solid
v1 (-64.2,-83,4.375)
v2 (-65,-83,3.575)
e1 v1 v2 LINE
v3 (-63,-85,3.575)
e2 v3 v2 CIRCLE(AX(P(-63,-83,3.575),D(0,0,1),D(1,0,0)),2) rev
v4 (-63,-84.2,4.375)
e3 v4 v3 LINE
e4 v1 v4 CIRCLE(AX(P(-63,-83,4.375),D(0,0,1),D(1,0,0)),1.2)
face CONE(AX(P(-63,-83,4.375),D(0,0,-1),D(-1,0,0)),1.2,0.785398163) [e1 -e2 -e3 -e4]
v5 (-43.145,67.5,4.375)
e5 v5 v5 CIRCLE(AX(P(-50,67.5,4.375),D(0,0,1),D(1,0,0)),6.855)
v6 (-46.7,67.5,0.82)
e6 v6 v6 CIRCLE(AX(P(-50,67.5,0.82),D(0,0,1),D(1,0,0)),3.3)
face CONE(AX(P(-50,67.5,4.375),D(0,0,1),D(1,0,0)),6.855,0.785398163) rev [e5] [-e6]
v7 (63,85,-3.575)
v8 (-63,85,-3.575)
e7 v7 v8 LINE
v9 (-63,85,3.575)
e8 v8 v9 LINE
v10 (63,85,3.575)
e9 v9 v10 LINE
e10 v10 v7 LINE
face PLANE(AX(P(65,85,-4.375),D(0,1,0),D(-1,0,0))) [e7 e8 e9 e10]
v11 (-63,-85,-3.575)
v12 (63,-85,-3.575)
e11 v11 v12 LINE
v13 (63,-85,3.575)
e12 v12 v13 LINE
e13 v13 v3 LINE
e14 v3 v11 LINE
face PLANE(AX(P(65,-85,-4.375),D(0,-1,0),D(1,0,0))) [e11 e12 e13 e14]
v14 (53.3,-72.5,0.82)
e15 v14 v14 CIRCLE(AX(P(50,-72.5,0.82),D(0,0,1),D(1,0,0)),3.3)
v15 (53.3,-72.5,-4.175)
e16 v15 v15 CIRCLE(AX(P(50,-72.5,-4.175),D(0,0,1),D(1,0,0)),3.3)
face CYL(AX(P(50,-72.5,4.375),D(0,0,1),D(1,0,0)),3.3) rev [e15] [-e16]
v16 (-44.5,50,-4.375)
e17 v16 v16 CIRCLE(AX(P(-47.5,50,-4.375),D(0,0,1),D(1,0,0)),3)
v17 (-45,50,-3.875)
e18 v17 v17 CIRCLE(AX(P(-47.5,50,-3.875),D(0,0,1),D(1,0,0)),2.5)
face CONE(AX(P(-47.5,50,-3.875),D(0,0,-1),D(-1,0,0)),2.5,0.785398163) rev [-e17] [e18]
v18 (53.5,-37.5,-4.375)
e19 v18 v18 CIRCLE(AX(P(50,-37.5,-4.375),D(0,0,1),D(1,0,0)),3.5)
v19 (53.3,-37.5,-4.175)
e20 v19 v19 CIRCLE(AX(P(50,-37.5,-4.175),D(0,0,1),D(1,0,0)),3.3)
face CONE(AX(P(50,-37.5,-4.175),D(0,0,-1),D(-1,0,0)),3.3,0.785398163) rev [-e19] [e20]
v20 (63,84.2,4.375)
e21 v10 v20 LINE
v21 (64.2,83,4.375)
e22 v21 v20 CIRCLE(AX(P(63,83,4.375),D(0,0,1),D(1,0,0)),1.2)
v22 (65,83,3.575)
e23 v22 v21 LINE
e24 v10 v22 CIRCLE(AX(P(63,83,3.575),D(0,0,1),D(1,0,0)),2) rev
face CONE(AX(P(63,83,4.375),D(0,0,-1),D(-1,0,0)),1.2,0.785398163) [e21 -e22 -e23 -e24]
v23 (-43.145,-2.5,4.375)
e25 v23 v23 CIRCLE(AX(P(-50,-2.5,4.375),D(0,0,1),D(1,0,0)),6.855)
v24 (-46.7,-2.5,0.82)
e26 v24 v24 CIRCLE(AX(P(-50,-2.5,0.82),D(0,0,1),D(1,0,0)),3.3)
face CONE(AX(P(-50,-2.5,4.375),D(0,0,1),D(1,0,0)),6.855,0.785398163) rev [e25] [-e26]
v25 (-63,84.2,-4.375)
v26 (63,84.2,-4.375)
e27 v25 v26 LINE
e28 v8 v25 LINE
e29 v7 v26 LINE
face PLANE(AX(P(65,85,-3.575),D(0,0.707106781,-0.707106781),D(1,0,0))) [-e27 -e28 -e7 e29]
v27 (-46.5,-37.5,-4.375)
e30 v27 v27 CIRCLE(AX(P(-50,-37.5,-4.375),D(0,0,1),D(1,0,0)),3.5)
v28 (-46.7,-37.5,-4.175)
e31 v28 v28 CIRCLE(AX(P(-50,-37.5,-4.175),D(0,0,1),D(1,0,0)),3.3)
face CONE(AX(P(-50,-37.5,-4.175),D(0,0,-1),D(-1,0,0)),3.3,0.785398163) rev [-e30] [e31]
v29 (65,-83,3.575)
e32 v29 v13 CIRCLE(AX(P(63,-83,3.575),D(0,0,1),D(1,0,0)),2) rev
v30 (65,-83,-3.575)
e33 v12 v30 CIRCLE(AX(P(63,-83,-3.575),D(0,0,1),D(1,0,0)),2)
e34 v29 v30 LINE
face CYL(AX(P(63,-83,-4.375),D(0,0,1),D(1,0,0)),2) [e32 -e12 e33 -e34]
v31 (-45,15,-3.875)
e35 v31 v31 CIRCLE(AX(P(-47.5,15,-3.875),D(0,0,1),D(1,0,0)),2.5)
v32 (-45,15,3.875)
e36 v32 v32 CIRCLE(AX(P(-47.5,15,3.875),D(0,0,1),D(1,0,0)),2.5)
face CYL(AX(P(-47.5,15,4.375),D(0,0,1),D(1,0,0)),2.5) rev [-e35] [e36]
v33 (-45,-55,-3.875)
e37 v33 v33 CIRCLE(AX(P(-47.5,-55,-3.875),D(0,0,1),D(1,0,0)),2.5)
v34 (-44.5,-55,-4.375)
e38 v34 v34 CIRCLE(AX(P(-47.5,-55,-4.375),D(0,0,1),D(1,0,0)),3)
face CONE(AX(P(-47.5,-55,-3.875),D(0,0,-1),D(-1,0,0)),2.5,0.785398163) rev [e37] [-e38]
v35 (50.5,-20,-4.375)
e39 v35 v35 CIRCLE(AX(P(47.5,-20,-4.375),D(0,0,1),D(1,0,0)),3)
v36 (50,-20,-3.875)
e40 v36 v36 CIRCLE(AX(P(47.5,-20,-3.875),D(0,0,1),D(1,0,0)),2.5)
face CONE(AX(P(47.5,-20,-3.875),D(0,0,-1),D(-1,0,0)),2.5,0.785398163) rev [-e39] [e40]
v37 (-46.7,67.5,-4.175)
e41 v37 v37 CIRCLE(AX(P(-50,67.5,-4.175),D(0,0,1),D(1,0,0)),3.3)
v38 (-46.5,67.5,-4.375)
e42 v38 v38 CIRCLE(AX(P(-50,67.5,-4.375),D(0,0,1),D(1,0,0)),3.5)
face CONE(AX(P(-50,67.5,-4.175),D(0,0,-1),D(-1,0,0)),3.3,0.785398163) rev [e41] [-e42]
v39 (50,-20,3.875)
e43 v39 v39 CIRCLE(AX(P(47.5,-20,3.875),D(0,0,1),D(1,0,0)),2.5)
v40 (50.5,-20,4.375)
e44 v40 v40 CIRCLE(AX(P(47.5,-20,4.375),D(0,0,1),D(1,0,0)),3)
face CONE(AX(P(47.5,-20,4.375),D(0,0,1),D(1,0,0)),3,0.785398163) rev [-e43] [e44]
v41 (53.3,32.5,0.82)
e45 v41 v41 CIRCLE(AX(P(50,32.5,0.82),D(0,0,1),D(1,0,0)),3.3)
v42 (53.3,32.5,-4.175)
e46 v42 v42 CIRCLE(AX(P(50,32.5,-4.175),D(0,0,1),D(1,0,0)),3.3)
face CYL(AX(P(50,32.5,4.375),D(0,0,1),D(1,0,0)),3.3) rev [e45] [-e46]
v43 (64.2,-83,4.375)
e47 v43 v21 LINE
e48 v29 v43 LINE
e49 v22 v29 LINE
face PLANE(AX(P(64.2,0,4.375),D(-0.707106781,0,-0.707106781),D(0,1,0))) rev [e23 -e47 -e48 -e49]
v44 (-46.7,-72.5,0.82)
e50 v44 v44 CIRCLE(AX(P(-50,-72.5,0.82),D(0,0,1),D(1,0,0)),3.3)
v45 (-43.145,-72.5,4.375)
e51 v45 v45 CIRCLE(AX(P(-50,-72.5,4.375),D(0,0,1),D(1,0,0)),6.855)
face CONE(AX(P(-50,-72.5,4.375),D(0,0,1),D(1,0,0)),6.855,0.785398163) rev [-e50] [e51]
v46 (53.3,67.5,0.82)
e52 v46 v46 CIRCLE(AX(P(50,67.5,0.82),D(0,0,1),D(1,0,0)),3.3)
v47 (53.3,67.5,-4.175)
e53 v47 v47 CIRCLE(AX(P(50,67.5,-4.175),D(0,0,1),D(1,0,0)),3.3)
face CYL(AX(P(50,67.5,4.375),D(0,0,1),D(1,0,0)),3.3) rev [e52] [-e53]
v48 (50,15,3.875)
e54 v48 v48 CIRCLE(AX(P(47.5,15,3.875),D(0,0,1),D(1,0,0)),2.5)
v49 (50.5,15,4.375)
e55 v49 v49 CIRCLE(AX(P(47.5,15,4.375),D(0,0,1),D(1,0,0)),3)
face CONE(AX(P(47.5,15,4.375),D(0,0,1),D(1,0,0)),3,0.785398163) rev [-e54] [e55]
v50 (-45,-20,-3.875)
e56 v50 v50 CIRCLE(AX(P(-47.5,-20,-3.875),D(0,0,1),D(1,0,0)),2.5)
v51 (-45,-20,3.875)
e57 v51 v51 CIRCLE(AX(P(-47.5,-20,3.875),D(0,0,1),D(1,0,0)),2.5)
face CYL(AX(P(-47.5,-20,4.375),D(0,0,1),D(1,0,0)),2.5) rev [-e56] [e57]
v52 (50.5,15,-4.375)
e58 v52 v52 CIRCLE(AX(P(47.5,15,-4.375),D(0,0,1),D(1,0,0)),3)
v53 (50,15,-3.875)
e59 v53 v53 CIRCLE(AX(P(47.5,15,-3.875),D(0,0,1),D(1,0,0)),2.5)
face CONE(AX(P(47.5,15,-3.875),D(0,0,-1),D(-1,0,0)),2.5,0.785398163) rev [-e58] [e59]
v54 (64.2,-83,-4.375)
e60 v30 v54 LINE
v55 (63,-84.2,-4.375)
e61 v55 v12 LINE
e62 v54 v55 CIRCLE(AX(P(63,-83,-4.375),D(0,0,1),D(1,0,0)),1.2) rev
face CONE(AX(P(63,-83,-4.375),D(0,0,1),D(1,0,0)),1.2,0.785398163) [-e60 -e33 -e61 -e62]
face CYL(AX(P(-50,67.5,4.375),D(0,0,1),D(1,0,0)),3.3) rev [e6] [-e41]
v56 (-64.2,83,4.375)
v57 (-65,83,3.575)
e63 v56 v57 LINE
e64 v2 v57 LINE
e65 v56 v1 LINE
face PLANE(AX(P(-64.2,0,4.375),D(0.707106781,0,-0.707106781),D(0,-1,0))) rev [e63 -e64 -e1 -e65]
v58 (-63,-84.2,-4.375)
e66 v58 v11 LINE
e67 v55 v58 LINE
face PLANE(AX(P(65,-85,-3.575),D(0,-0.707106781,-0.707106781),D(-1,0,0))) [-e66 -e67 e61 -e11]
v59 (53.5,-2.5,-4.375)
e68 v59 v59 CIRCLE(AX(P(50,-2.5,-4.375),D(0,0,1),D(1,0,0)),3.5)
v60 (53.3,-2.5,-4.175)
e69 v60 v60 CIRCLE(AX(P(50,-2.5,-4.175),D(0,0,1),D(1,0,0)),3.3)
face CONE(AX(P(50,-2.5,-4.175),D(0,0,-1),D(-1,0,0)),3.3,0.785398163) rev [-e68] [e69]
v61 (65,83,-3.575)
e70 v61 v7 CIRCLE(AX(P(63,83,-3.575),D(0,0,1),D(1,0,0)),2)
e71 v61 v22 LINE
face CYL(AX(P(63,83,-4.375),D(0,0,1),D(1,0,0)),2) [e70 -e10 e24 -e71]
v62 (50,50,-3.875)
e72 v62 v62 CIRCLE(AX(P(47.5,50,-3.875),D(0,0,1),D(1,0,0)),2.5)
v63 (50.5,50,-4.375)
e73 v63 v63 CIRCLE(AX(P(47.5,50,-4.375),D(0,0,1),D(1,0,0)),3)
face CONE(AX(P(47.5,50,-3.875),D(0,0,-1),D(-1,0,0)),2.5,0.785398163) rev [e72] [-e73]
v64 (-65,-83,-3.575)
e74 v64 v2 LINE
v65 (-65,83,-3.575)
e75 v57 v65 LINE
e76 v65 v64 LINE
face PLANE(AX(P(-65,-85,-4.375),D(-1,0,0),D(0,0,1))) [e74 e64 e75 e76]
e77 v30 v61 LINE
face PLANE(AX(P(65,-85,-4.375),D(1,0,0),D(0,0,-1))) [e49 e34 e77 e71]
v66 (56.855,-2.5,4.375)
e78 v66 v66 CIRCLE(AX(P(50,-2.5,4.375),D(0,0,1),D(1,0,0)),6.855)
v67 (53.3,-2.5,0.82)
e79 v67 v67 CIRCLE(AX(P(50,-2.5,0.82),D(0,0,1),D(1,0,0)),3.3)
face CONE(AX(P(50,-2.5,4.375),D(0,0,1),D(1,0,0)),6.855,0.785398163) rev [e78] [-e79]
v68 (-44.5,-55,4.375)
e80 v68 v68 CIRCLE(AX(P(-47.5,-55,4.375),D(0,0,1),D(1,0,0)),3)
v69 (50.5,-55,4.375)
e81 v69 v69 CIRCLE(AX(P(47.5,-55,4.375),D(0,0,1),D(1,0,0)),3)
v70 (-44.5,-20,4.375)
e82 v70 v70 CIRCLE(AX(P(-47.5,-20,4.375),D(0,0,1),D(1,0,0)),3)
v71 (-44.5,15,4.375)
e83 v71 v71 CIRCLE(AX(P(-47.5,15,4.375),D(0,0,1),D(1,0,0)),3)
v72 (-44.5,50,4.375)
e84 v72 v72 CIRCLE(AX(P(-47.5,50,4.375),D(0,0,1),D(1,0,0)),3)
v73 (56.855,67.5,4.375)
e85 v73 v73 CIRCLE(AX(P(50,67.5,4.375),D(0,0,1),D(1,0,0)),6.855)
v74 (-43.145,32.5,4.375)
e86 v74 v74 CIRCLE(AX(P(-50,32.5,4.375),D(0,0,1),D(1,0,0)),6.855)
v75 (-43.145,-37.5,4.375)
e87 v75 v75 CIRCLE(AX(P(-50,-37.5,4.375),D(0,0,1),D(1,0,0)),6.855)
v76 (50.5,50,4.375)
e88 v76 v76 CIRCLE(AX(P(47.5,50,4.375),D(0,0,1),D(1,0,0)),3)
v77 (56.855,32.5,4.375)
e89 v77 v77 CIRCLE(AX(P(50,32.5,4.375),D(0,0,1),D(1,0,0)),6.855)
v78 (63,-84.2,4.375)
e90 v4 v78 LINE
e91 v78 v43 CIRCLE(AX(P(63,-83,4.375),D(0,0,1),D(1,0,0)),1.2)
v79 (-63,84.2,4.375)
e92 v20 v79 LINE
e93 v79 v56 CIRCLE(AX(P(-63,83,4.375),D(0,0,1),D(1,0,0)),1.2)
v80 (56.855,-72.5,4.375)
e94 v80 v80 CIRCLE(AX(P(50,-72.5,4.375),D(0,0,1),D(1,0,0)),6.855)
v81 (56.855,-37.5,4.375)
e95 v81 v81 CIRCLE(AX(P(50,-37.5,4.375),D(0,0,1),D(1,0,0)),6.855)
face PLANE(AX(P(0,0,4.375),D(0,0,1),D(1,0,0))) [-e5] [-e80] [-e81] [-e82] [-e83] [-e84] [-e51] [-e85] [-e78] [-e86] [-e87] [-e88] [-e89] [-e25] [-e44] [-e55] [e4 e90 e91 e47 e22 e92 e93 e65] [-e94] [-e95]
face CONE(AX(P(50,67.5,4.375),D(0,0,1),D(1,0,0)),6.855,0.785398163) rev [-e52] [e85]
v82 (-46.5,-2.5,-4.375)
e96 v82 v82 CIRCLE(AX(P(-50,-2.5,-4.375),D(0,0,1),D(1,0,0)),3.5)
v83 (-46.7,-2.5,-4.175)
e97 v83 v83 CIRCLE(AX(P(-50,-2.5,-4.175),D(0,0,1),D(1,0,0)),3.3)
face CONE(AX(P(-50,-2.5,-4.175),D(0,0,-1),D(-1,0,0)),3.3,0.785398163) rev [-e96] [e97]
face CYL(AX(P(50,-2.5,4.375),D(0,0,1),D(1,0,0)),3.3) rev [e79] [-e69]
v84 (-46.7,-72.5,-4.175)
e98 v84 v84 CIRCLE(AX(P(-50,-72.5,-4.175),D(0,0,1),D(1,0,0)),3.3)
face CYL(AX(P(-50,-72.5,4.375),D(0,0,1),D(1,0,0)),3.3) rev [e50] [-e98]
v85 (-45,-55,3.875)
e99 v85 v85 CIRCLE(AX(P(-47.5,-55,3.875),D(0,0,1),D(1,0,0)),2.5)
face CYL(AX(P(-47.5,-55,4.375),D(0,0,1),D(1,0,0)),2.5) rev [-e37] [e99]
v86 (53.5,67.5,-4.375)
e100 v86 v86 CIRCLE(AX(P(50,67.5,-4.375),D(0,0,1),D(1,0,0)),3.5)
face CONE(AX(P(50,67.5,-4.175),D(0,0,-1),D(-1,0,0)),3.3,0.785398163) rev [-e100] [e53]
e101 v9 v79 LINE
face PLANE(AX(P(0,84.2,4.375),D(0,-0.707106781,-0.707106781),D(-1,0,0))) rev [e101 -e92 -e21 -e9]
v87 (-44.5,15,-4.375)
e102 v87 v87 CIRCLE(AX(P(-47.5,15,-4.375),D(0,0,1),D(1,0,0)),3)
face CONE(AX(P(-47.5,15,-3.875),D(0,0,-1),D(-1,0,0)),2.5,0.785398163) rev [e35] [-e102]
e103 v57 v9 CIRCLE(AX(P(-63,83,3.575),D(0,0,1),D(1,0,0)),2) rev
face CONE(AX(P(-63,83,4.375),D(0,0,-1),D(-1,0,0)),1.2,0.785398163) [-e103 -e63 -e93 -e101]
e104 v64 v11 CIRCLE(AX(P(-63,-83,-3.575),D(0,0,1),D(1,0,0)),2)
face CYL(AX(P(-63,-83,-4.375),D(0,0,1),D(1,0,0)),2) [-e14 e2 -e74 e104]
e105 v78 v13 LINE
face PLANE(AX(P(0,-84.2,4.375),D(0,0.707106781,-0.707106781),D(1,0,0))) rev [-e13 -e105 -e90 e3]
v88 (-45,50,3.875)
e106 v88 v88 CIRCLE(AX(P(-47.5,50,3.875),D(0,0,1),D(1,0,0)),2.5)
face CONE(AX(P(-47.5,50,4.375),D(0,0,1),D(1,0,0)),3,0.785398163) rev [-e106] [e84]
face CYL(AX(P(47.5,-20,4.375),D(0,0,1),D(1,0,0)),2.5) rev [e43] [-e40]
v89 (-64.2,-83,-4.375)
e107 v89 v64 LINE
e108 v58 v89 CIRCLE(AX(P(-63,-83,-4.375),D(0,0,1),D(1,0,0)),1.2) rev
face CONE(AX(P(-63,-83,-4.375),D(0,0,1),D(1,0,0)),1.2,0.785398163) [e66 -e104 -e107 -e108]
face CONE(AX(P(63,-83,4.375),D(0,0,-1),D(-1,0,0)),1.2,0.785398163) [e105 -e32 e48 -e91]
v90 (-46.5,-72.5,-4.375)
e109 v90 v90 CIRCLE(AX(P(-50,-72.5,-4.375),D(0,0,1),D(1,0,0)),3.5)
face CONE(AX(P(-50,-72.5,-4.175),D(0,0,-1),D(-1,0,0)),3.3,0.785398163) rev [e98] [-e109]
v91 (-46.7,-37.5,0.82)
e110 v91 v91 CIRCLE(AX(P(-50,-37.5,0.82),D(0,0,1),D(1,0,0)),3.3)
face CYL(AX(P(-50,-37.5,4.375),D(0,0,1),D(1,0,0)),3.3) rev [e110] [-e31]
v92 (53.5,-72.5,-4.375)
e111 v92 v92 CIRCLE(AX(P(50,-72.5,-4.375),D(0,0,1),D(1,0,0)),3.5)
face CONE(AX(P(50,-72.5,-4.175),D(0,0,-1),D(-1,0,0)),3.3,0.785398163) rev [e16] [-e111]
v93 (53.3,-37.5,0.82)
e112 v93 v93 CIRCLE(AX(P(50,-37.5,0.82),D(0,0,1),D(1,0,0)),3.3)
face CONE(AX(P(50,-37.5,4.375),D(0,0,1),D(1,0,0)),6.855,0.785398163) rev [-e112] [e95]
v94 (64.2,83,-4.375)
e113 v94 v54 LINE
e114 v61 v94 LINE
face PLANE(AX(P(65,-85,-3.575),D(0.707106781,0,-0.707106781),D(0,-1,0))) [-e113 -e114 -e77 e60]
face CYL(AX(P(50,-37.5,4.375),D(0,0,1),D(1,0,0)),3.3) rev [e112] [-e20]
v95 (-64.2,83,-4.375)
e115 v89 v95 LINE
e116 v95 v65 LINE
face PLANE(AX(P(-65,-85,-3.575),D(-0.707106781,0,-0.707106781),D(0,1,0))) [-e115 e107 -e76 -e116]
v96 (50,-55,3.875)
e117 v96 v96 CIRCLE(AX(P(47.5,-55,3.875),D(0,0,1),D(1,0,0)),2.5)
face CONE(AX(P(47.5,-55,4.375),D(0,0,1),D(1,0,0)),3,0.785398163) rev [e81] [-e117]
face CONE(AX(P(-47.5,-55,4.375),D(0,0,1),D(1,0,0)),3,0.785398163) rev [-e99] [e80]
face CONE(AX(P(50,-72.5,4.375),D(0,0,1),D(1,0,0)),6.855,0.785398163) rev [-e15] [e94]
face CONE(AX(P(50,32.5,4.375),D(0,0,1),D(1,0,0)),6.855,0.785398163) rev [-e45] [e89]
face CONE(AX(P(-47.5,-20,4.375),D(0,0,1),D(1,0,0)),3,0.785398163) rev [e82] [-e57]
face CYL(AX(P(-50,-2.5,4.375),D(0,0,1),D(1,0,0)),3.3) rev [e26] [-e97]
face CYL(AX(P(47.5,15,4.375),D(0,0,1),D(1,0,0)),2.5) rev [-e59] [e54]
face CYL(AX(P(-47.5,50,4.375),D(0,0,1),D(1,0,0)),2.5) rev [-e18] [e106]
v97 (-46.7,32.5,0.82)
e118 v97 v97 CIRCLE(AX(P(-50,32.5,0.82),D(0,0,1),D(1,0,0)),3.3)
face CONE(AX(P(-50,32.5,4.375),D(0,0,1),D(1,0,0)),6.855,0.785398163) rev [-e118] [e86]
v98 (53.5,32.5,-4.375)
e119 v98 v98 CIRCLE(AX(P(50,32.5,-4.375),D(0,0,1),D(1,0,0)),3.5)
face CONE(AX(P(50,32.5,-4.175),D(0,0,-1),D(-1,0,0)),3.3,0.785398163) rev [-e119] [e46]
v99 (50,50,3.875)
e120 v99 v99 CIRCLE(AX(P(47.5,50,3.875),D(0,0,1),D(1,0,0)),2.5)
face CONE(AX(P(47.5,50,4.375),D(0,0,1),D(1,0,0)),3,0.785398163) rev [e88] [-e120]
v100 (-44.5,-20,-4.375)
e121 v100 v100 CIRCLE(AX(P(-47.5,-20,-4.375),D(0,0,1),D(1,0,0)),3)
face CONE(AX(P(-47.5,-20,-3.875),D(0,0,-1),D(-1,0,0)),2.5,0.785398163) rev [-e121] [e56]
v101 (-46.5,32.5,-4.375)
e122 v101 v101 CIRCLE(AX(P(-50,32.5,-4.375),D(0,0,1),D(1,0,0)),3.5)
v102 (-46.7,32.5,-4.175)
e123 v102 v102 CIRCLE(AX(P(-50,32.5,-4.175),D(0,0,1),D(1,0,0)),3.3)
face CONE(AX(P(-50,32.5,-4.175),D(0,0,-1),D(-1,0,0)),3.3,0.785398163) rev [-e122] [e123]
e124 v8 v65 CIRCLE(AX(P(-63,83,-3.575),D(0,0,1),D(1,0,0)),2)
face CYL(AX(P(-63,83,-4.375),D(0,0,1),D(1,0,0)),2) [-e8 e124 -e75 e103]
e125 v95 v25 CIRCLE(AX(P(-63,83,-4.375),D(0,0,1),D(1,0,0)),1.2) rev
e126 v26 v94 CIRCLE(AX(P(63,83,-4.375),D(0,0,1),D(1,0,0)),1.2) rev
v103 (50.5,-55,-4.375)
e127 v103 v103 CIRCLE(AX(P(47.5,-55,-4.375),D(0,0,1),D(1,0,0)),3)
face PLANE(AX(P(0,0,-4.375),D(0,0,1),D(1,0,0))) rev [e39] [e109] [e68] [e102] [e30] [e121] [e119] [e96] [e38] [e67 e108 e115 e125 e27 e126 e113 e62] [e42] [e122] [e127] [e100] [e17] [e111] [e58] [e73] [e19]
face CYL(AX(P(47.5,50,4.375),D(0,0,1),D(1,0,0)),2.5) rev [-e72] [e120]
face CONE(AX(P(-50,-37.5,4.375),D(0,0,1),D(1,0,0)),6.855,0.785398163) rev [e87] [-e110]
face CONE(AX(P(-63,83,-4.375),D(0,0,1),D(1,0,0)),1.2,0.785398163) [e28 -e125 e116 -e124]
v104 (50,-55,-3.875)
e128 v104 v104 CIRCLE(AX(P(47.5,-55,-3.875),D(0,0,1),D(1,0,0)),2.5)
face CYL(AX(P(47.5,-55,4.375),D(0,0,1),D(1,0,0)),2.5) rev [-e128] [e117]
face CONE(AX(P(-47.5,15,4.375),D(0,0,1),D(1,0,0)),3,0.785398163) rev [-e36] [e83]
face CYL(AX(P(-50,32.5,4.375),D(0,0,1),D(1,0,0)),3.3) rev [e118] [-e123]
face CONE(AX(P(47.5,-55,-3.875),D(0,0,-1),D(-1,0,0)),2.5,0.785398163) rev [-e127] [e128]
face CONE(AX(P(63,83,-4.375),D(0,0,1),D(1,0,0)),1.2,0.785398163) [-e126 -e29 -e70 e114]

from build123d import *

# Parameters (mm, degrees)
BASE_FLANGE1_START                           = -4.375
BASE_FLANGE1_OUTLINE_W                       = 130
BASE_FLANGE1_OUTLINE_H                       = 170
BASE_FLANGE1_DEPTH                           = 8.75
M6_TAPPED_HOLE1_AT_2_COUNT                   = 2
M6_TAPPED_HOLE1_AT_2_PITCH                   = 105
M6_TAPPED_HOLE1_AT_3_COUNT                   = 2
M6_TAPPED_HOLE1_AT_3_PITCH                   = 70
M6_TAPPED_HOLE1_AT_4_COUNT                   = 2
M6_TAPPED_HOLE1_AT_4_PITCH                   = 35
CSK_FOR_M6_HEX_SOCKET_COUNTERSUNK_HE_2_COUNT = 2
CSK_FOR_M6_HEX_SOCKET_COUNTERSUNK_HE_2_PITCH = 35
CSK_FOR_M6_HEX_SOCKET_COUNTERSUNK_HE_3_COUNT = 2
CSK_FOR_M6_HEX_SOCKET_COUNTERSUNK_HE_3_PITCH = 70
CSK_FOR_M6_HEX_SOCKET_COUNTERSUNK_HE_4_COUNT = 2
CSK_FOR_M6_HEX_SOCKET_COUNTERSUNK_HE_4_PITCH = 105
CSK_FOR_M6_HEX_SOCKET_COUNTERSUNK_HE_5_COUNT = 2
CSK_FOR_M6_HEX_SOCKET_COUNTERSUNK_HE_5_PITCH = 140
FILLET1_R                                    = 2
CHAMFER1_SIZE                                = 0.8


# Read off the part's stored shape, not the designer's step: Base-Flange1
with BuildPart() as part:
    # Base-Flange1 outline → Base-Flange1 (new body)
    with BuildSketch(Plane.XY.offset(BASE_FLANGE1_START)):
        Rectangle(BASE_FLANGE1_OUTLINE_W, BASE_FLANGE1_OUTLINE_H)
    extrude(amount=BASE_FLANGE1_DEPTH)

    # Sketch8 → M6 Tapped Hole1 (revolve, cut)
    with BuildSketch(Plane(origin=(-47.5, -55, 4.375), x_dir=(0, -1, 0), z_dir=(1, 0, 0))):
        Polygon((0, 0), (0, 8.75), (3, 8.75), (2.5, 8.25), (2.5, 0.5), (3, 0), align=None)
    m6_tapped_hole1 = revolve(axis=Axis((-47.5, -55, 10.725), (0, 0, -1)), mode=Mode.SUBTRACT)

    # M6 Tapped Hole1 at 2: M6 Tapped Hole1 ×2
    with Locations(*[(0, i * M6_TAPPED_HOLE1_AT_2_PITCH, 0) for i in range(1, M6_TAPPED_HOLE1_AT_2_COUNT)]):
        add(m6_tapped_hole1, mode=Mode.SUBTRACT)

    # M6 Tapped Hole1 at 3: M6 Tapped Hole1 ×2
    with Locations(*[(0, i * M6_TAPPED_HOLE1_AT_3_PITCH, 0) for i in range(1, M6_TAPPED_HOLE1_AT_3_COUNT)]):
        add(m6_tapped_hole1, mode=Mode.SUBTRACT)

    # M6 Tapped Hole1 at 4: M6 Tapped Hole1 ×2
    with Locations(*[(0, i * M6_TAPPED_HOLE1_AT_4_PITCH, 0) for i in range(1, M6_TAPPED_HOLE1_AT_4_COUNT)]):
        add(m6_tapped_hole1, mode=Mode.SUBTRACT)

    # Sketch12 → CSK for M6 Hex Socket Countersunk Head Screw1 (revolve, cut)
    with BuildSketch(Plane(origin=(-50, -72.5, 4.375), x_dir=(0, -1, 0), z_dir=(1, 0, 0))):
        Polygon((0, 0), (0, 8.75), (3.5, 8.75), (3.3, 8.55), (3.3, 3.555), (6.855, 0), align=None)
    csk_for_m6_hex_socket_countersunk_head_s = revolve(axis=Axis((-50, -72.5, 10.725), (0, 0, -1)), mode=Mode.SUBTRACT)

    # CSK for M6 Hex Socket Countersunk He 2: CSK for M6 Hex Socket Countersunk Head Screw1 ×2
    with Locations(*[(0, i * CSK_FOR_M6_HEX_SOCKET_COUNTERSUNK_HE_2_PITCH, 0) for i in range(1, CSK_FOR_M6_HEX_SOCKET_COUNTERSUNK_HE_2_COUNT)]):
        add(csk_for_m6_hex_socket_countersunk_head_s, mode=Mode.SUBTRACT)

    # CSK for M6 Hex Socket Countersunk He 3: CSK for M6 Hex Socket Countersunk Head Screw1 ×2
    with Locations(*[(0, i * CSK_FOR_M6_HEX_SOCKET_COUNTERSUNK_HE_3_PITCH, 0) for i in range(1, CSK_FOR_M6_HEX_SOCKET_COUNTERSUNK_HE_3_COUNT)]):
        add(csk_for_m6_hex_socket_countersunk_head_s, mode=Mode.SUBTRACT)

    # CSK for M6 Hex Socket Countersunk He 4: CSK for M6 Hex Socket Countersunk Head Screw1 ×2
    with Locations(*[(0, i * CSK_FOR_M6_HEX_SOCKET_COUNTERSUNK_HE_4_PITCH, 0) for i in range(1, CSK_FOR_M6_HEX_SOCKET_COUNTERSUNK_HE_4_COUNT)]):
        add(csk_for_m6_hex_socket_countersunk_head_s, mode=Mode.SUBTRACT)

    # CSK for M6 Hex Socket Countersunk He 5: CSK for M6 Hex Socket Countersunk Head Screw1 ×2
    with Locations(*[(0, i * CSK_FOR_M6_HEX_SOCKET_COUNTERSUNK_HE_5_PITCH, 0) for i in range(1, CSK_FOR_M6_HEX_SOCKET_COUNTERSUNK_HE_5_COUNT)]):
        add(csk_for_m6_hex_socket_countersunk_head_s, mode=Mode.SUBTRACT)

    # Mirror1: M6 Tapped Hole1, CSK for M6 Hex Socket Countersunk Head Screw1 across plane
    add(m6_tapped_hole1.mirror(Plane(origin=(0, 0, 0), x_dir=(0, 0, 1), z_dir=(1, 0, 0))), mode=Mode.SUBTRACT)
    add(csk_for_m6_hex_socket_countersunk_head_s.mirror(Plane(origin=(0, 0, 0), x_dir=(0, 0, 1), z_dir=(1, 0, 0))), mode=Mode.SUBTRACT)

    # Mirror1 copy 1 sketch → Mirror1 copy 1 (revolve, cut)
    with BuildSketch(Plane(origin=(47.5, 50, 4.375), x_dir=(0, -1, 0), z_dir=(-1, 0, 0))):
        Polygon((0, 0), (0, -8.75), (3, -8.75), (2.5, -8.25), (2.5, -0.5), (3, 0), align=None)
    revolve(axis=Axis((47.5, 50, 10.725), (0, 0, 1)), mode=Mode.SUBTRACT)

    # Mirror1 copy 2 sketch → Mirror1 copy 2 (revolve, cut)
    with BuildSketch(Plane(origin=(47.5, 15, 4.375), x_dir=(0, -1, 0), z_dir=(-1, 0, 0))):
        Polygon((0, 0), (0, -8.75), (3, -8.75), (2.5, -8.25), (2.5, -0.5), (3, 0), align=None)
    revolve(axis=Axis((47.5, 15, 10.725), (0, 0, 1)), mode=Mode.SUBTRACT)

    # Mirror1 copy 3 sketch → Mirror1 copy 3 (revolve, cut)
    with BuildSketch(Plane(origin=(47.5, -20, 4.375), x_dir=(0, -1, 0), z_dir=(-1, 0, 0))):
        Polygon((0, 0), (0, -8.75), (3, -8.75), (2.5, -8.25), (2.5, -0.5), (3, 0), align=None)
    revolve(axis=Axis((47.5, -20, 10.725), (0, 0, 1)), mode=Mode.SUBTRACT)

    # Mirror1 copy 4 sketch → Mirror1 copy 4 (revolve, cut)
    with BuildSketch(Plane(origin=(50, -37.5, 4.375), x_dir=(0, -1, 0), z_dir=(-1, 0, 0))):
        Polygon((0, 0), (0, -8.75), (3.5, -8.75), (3.3, -8.55), (3.3, -3.555), (6.855, 0), align=None)
    revolve(axis=Axis((50, -37.5, 10.725), (0, 0, 1)), mode=Mode.SUBTRACT)

    # Mirror1 copy 5 sketch → Mirror1 copy 5 (revolve, cut)
    with BuildSketch(Plane(origin=(50, -2.5, 4.375), x_dir=(0, -1, 0), z_dir=(-1, 0, 0))):
        Polygon((0, 0), (0, -8.75), (3.5, -8.75), (3.3, -8.55), (3.3, -3.555), (6.855, 0), align=None)
    revolve(axis=Axis((50, -2.5, 10.725), (0, 0, 1)), mode=Mode.SUBTRACT)

    # Mirror1 copy 6 sketch → Mirror1 copy 6 (revolve, cut)
    with BuildSketch(Plane(origin=(50, 32.5, 4.375), x_dir=(0, -1, 0), z_dir=(-1, 0, 0))):
        Polygon((0, 0), (0, -8.75), (3.5, -8.75), (3.3, -8.55), (3.3, -3.555), (6.855, 0), align=None)
    revolve(axis=Axis((50, 32.5, 10.725), (0, 0, 1)), mode=Mode.SUBTRACT)

    # Mirror1 copy 7 sketch → Mirror1 copy 7 (revolve, cut)
    with BuildSketch(Plane(origin=(50, 67.5, 4.375), x_dir=(0, -1, 0), z_dir=(-1, 0, 0))):
        Polygon((0, 0), (0, -8.75), (3.5, -8.75), (3.3, -8.55), (3.3, -3.555), (6.855, 0), align=None)
    revolve(axis=Axis((50, 67.5, 10.725), (0, 0, 1)), mode=Mode.SUBTRACT)

    # Fillet1
    fillet1_edges = [part.edges().sort_by_distance(p)[0] for p in [
        (-65, 85, 0),
        (65, 85, 0),
        (65, -85, 0),
        (-65, -85, 0),
    ]]
    fillet(fillet1_edges, radius=FILLET1_R)

    # Chamfer1
    chamfer1_edges = [part.edges().sort_by_distance(p)[0] for p in [
        (65, 0, 4.375),
        (65, 0, -4.375),
        (-65, 0, 4.375),
        (0, -85, 4.375),
        (0, 85, 4.375),
        (-64.414213562, 84.414213562, 4.375),
        (-64.414213562, -84.414213562, 4.375),
        (64.414213562, -84.414213562, 4.375),
        (64.414213562, 84.414213562, 4.375),
        (0, 85, -4.375),
        (-65, 0, -4.375),
        (0, -85, -4.375),
        (-64.414213562, 84.414213562, -4.375),
        (-64.414213562, -84.414213562, -4.375),
        (64.414213562, -84.414213562, -4.375),
        (64.414213562, 84.414213562, -4.375),
    ]]
    chamfer(chamfer1_edges, length=CHAMFER1_SIZE)


solid = part.part
